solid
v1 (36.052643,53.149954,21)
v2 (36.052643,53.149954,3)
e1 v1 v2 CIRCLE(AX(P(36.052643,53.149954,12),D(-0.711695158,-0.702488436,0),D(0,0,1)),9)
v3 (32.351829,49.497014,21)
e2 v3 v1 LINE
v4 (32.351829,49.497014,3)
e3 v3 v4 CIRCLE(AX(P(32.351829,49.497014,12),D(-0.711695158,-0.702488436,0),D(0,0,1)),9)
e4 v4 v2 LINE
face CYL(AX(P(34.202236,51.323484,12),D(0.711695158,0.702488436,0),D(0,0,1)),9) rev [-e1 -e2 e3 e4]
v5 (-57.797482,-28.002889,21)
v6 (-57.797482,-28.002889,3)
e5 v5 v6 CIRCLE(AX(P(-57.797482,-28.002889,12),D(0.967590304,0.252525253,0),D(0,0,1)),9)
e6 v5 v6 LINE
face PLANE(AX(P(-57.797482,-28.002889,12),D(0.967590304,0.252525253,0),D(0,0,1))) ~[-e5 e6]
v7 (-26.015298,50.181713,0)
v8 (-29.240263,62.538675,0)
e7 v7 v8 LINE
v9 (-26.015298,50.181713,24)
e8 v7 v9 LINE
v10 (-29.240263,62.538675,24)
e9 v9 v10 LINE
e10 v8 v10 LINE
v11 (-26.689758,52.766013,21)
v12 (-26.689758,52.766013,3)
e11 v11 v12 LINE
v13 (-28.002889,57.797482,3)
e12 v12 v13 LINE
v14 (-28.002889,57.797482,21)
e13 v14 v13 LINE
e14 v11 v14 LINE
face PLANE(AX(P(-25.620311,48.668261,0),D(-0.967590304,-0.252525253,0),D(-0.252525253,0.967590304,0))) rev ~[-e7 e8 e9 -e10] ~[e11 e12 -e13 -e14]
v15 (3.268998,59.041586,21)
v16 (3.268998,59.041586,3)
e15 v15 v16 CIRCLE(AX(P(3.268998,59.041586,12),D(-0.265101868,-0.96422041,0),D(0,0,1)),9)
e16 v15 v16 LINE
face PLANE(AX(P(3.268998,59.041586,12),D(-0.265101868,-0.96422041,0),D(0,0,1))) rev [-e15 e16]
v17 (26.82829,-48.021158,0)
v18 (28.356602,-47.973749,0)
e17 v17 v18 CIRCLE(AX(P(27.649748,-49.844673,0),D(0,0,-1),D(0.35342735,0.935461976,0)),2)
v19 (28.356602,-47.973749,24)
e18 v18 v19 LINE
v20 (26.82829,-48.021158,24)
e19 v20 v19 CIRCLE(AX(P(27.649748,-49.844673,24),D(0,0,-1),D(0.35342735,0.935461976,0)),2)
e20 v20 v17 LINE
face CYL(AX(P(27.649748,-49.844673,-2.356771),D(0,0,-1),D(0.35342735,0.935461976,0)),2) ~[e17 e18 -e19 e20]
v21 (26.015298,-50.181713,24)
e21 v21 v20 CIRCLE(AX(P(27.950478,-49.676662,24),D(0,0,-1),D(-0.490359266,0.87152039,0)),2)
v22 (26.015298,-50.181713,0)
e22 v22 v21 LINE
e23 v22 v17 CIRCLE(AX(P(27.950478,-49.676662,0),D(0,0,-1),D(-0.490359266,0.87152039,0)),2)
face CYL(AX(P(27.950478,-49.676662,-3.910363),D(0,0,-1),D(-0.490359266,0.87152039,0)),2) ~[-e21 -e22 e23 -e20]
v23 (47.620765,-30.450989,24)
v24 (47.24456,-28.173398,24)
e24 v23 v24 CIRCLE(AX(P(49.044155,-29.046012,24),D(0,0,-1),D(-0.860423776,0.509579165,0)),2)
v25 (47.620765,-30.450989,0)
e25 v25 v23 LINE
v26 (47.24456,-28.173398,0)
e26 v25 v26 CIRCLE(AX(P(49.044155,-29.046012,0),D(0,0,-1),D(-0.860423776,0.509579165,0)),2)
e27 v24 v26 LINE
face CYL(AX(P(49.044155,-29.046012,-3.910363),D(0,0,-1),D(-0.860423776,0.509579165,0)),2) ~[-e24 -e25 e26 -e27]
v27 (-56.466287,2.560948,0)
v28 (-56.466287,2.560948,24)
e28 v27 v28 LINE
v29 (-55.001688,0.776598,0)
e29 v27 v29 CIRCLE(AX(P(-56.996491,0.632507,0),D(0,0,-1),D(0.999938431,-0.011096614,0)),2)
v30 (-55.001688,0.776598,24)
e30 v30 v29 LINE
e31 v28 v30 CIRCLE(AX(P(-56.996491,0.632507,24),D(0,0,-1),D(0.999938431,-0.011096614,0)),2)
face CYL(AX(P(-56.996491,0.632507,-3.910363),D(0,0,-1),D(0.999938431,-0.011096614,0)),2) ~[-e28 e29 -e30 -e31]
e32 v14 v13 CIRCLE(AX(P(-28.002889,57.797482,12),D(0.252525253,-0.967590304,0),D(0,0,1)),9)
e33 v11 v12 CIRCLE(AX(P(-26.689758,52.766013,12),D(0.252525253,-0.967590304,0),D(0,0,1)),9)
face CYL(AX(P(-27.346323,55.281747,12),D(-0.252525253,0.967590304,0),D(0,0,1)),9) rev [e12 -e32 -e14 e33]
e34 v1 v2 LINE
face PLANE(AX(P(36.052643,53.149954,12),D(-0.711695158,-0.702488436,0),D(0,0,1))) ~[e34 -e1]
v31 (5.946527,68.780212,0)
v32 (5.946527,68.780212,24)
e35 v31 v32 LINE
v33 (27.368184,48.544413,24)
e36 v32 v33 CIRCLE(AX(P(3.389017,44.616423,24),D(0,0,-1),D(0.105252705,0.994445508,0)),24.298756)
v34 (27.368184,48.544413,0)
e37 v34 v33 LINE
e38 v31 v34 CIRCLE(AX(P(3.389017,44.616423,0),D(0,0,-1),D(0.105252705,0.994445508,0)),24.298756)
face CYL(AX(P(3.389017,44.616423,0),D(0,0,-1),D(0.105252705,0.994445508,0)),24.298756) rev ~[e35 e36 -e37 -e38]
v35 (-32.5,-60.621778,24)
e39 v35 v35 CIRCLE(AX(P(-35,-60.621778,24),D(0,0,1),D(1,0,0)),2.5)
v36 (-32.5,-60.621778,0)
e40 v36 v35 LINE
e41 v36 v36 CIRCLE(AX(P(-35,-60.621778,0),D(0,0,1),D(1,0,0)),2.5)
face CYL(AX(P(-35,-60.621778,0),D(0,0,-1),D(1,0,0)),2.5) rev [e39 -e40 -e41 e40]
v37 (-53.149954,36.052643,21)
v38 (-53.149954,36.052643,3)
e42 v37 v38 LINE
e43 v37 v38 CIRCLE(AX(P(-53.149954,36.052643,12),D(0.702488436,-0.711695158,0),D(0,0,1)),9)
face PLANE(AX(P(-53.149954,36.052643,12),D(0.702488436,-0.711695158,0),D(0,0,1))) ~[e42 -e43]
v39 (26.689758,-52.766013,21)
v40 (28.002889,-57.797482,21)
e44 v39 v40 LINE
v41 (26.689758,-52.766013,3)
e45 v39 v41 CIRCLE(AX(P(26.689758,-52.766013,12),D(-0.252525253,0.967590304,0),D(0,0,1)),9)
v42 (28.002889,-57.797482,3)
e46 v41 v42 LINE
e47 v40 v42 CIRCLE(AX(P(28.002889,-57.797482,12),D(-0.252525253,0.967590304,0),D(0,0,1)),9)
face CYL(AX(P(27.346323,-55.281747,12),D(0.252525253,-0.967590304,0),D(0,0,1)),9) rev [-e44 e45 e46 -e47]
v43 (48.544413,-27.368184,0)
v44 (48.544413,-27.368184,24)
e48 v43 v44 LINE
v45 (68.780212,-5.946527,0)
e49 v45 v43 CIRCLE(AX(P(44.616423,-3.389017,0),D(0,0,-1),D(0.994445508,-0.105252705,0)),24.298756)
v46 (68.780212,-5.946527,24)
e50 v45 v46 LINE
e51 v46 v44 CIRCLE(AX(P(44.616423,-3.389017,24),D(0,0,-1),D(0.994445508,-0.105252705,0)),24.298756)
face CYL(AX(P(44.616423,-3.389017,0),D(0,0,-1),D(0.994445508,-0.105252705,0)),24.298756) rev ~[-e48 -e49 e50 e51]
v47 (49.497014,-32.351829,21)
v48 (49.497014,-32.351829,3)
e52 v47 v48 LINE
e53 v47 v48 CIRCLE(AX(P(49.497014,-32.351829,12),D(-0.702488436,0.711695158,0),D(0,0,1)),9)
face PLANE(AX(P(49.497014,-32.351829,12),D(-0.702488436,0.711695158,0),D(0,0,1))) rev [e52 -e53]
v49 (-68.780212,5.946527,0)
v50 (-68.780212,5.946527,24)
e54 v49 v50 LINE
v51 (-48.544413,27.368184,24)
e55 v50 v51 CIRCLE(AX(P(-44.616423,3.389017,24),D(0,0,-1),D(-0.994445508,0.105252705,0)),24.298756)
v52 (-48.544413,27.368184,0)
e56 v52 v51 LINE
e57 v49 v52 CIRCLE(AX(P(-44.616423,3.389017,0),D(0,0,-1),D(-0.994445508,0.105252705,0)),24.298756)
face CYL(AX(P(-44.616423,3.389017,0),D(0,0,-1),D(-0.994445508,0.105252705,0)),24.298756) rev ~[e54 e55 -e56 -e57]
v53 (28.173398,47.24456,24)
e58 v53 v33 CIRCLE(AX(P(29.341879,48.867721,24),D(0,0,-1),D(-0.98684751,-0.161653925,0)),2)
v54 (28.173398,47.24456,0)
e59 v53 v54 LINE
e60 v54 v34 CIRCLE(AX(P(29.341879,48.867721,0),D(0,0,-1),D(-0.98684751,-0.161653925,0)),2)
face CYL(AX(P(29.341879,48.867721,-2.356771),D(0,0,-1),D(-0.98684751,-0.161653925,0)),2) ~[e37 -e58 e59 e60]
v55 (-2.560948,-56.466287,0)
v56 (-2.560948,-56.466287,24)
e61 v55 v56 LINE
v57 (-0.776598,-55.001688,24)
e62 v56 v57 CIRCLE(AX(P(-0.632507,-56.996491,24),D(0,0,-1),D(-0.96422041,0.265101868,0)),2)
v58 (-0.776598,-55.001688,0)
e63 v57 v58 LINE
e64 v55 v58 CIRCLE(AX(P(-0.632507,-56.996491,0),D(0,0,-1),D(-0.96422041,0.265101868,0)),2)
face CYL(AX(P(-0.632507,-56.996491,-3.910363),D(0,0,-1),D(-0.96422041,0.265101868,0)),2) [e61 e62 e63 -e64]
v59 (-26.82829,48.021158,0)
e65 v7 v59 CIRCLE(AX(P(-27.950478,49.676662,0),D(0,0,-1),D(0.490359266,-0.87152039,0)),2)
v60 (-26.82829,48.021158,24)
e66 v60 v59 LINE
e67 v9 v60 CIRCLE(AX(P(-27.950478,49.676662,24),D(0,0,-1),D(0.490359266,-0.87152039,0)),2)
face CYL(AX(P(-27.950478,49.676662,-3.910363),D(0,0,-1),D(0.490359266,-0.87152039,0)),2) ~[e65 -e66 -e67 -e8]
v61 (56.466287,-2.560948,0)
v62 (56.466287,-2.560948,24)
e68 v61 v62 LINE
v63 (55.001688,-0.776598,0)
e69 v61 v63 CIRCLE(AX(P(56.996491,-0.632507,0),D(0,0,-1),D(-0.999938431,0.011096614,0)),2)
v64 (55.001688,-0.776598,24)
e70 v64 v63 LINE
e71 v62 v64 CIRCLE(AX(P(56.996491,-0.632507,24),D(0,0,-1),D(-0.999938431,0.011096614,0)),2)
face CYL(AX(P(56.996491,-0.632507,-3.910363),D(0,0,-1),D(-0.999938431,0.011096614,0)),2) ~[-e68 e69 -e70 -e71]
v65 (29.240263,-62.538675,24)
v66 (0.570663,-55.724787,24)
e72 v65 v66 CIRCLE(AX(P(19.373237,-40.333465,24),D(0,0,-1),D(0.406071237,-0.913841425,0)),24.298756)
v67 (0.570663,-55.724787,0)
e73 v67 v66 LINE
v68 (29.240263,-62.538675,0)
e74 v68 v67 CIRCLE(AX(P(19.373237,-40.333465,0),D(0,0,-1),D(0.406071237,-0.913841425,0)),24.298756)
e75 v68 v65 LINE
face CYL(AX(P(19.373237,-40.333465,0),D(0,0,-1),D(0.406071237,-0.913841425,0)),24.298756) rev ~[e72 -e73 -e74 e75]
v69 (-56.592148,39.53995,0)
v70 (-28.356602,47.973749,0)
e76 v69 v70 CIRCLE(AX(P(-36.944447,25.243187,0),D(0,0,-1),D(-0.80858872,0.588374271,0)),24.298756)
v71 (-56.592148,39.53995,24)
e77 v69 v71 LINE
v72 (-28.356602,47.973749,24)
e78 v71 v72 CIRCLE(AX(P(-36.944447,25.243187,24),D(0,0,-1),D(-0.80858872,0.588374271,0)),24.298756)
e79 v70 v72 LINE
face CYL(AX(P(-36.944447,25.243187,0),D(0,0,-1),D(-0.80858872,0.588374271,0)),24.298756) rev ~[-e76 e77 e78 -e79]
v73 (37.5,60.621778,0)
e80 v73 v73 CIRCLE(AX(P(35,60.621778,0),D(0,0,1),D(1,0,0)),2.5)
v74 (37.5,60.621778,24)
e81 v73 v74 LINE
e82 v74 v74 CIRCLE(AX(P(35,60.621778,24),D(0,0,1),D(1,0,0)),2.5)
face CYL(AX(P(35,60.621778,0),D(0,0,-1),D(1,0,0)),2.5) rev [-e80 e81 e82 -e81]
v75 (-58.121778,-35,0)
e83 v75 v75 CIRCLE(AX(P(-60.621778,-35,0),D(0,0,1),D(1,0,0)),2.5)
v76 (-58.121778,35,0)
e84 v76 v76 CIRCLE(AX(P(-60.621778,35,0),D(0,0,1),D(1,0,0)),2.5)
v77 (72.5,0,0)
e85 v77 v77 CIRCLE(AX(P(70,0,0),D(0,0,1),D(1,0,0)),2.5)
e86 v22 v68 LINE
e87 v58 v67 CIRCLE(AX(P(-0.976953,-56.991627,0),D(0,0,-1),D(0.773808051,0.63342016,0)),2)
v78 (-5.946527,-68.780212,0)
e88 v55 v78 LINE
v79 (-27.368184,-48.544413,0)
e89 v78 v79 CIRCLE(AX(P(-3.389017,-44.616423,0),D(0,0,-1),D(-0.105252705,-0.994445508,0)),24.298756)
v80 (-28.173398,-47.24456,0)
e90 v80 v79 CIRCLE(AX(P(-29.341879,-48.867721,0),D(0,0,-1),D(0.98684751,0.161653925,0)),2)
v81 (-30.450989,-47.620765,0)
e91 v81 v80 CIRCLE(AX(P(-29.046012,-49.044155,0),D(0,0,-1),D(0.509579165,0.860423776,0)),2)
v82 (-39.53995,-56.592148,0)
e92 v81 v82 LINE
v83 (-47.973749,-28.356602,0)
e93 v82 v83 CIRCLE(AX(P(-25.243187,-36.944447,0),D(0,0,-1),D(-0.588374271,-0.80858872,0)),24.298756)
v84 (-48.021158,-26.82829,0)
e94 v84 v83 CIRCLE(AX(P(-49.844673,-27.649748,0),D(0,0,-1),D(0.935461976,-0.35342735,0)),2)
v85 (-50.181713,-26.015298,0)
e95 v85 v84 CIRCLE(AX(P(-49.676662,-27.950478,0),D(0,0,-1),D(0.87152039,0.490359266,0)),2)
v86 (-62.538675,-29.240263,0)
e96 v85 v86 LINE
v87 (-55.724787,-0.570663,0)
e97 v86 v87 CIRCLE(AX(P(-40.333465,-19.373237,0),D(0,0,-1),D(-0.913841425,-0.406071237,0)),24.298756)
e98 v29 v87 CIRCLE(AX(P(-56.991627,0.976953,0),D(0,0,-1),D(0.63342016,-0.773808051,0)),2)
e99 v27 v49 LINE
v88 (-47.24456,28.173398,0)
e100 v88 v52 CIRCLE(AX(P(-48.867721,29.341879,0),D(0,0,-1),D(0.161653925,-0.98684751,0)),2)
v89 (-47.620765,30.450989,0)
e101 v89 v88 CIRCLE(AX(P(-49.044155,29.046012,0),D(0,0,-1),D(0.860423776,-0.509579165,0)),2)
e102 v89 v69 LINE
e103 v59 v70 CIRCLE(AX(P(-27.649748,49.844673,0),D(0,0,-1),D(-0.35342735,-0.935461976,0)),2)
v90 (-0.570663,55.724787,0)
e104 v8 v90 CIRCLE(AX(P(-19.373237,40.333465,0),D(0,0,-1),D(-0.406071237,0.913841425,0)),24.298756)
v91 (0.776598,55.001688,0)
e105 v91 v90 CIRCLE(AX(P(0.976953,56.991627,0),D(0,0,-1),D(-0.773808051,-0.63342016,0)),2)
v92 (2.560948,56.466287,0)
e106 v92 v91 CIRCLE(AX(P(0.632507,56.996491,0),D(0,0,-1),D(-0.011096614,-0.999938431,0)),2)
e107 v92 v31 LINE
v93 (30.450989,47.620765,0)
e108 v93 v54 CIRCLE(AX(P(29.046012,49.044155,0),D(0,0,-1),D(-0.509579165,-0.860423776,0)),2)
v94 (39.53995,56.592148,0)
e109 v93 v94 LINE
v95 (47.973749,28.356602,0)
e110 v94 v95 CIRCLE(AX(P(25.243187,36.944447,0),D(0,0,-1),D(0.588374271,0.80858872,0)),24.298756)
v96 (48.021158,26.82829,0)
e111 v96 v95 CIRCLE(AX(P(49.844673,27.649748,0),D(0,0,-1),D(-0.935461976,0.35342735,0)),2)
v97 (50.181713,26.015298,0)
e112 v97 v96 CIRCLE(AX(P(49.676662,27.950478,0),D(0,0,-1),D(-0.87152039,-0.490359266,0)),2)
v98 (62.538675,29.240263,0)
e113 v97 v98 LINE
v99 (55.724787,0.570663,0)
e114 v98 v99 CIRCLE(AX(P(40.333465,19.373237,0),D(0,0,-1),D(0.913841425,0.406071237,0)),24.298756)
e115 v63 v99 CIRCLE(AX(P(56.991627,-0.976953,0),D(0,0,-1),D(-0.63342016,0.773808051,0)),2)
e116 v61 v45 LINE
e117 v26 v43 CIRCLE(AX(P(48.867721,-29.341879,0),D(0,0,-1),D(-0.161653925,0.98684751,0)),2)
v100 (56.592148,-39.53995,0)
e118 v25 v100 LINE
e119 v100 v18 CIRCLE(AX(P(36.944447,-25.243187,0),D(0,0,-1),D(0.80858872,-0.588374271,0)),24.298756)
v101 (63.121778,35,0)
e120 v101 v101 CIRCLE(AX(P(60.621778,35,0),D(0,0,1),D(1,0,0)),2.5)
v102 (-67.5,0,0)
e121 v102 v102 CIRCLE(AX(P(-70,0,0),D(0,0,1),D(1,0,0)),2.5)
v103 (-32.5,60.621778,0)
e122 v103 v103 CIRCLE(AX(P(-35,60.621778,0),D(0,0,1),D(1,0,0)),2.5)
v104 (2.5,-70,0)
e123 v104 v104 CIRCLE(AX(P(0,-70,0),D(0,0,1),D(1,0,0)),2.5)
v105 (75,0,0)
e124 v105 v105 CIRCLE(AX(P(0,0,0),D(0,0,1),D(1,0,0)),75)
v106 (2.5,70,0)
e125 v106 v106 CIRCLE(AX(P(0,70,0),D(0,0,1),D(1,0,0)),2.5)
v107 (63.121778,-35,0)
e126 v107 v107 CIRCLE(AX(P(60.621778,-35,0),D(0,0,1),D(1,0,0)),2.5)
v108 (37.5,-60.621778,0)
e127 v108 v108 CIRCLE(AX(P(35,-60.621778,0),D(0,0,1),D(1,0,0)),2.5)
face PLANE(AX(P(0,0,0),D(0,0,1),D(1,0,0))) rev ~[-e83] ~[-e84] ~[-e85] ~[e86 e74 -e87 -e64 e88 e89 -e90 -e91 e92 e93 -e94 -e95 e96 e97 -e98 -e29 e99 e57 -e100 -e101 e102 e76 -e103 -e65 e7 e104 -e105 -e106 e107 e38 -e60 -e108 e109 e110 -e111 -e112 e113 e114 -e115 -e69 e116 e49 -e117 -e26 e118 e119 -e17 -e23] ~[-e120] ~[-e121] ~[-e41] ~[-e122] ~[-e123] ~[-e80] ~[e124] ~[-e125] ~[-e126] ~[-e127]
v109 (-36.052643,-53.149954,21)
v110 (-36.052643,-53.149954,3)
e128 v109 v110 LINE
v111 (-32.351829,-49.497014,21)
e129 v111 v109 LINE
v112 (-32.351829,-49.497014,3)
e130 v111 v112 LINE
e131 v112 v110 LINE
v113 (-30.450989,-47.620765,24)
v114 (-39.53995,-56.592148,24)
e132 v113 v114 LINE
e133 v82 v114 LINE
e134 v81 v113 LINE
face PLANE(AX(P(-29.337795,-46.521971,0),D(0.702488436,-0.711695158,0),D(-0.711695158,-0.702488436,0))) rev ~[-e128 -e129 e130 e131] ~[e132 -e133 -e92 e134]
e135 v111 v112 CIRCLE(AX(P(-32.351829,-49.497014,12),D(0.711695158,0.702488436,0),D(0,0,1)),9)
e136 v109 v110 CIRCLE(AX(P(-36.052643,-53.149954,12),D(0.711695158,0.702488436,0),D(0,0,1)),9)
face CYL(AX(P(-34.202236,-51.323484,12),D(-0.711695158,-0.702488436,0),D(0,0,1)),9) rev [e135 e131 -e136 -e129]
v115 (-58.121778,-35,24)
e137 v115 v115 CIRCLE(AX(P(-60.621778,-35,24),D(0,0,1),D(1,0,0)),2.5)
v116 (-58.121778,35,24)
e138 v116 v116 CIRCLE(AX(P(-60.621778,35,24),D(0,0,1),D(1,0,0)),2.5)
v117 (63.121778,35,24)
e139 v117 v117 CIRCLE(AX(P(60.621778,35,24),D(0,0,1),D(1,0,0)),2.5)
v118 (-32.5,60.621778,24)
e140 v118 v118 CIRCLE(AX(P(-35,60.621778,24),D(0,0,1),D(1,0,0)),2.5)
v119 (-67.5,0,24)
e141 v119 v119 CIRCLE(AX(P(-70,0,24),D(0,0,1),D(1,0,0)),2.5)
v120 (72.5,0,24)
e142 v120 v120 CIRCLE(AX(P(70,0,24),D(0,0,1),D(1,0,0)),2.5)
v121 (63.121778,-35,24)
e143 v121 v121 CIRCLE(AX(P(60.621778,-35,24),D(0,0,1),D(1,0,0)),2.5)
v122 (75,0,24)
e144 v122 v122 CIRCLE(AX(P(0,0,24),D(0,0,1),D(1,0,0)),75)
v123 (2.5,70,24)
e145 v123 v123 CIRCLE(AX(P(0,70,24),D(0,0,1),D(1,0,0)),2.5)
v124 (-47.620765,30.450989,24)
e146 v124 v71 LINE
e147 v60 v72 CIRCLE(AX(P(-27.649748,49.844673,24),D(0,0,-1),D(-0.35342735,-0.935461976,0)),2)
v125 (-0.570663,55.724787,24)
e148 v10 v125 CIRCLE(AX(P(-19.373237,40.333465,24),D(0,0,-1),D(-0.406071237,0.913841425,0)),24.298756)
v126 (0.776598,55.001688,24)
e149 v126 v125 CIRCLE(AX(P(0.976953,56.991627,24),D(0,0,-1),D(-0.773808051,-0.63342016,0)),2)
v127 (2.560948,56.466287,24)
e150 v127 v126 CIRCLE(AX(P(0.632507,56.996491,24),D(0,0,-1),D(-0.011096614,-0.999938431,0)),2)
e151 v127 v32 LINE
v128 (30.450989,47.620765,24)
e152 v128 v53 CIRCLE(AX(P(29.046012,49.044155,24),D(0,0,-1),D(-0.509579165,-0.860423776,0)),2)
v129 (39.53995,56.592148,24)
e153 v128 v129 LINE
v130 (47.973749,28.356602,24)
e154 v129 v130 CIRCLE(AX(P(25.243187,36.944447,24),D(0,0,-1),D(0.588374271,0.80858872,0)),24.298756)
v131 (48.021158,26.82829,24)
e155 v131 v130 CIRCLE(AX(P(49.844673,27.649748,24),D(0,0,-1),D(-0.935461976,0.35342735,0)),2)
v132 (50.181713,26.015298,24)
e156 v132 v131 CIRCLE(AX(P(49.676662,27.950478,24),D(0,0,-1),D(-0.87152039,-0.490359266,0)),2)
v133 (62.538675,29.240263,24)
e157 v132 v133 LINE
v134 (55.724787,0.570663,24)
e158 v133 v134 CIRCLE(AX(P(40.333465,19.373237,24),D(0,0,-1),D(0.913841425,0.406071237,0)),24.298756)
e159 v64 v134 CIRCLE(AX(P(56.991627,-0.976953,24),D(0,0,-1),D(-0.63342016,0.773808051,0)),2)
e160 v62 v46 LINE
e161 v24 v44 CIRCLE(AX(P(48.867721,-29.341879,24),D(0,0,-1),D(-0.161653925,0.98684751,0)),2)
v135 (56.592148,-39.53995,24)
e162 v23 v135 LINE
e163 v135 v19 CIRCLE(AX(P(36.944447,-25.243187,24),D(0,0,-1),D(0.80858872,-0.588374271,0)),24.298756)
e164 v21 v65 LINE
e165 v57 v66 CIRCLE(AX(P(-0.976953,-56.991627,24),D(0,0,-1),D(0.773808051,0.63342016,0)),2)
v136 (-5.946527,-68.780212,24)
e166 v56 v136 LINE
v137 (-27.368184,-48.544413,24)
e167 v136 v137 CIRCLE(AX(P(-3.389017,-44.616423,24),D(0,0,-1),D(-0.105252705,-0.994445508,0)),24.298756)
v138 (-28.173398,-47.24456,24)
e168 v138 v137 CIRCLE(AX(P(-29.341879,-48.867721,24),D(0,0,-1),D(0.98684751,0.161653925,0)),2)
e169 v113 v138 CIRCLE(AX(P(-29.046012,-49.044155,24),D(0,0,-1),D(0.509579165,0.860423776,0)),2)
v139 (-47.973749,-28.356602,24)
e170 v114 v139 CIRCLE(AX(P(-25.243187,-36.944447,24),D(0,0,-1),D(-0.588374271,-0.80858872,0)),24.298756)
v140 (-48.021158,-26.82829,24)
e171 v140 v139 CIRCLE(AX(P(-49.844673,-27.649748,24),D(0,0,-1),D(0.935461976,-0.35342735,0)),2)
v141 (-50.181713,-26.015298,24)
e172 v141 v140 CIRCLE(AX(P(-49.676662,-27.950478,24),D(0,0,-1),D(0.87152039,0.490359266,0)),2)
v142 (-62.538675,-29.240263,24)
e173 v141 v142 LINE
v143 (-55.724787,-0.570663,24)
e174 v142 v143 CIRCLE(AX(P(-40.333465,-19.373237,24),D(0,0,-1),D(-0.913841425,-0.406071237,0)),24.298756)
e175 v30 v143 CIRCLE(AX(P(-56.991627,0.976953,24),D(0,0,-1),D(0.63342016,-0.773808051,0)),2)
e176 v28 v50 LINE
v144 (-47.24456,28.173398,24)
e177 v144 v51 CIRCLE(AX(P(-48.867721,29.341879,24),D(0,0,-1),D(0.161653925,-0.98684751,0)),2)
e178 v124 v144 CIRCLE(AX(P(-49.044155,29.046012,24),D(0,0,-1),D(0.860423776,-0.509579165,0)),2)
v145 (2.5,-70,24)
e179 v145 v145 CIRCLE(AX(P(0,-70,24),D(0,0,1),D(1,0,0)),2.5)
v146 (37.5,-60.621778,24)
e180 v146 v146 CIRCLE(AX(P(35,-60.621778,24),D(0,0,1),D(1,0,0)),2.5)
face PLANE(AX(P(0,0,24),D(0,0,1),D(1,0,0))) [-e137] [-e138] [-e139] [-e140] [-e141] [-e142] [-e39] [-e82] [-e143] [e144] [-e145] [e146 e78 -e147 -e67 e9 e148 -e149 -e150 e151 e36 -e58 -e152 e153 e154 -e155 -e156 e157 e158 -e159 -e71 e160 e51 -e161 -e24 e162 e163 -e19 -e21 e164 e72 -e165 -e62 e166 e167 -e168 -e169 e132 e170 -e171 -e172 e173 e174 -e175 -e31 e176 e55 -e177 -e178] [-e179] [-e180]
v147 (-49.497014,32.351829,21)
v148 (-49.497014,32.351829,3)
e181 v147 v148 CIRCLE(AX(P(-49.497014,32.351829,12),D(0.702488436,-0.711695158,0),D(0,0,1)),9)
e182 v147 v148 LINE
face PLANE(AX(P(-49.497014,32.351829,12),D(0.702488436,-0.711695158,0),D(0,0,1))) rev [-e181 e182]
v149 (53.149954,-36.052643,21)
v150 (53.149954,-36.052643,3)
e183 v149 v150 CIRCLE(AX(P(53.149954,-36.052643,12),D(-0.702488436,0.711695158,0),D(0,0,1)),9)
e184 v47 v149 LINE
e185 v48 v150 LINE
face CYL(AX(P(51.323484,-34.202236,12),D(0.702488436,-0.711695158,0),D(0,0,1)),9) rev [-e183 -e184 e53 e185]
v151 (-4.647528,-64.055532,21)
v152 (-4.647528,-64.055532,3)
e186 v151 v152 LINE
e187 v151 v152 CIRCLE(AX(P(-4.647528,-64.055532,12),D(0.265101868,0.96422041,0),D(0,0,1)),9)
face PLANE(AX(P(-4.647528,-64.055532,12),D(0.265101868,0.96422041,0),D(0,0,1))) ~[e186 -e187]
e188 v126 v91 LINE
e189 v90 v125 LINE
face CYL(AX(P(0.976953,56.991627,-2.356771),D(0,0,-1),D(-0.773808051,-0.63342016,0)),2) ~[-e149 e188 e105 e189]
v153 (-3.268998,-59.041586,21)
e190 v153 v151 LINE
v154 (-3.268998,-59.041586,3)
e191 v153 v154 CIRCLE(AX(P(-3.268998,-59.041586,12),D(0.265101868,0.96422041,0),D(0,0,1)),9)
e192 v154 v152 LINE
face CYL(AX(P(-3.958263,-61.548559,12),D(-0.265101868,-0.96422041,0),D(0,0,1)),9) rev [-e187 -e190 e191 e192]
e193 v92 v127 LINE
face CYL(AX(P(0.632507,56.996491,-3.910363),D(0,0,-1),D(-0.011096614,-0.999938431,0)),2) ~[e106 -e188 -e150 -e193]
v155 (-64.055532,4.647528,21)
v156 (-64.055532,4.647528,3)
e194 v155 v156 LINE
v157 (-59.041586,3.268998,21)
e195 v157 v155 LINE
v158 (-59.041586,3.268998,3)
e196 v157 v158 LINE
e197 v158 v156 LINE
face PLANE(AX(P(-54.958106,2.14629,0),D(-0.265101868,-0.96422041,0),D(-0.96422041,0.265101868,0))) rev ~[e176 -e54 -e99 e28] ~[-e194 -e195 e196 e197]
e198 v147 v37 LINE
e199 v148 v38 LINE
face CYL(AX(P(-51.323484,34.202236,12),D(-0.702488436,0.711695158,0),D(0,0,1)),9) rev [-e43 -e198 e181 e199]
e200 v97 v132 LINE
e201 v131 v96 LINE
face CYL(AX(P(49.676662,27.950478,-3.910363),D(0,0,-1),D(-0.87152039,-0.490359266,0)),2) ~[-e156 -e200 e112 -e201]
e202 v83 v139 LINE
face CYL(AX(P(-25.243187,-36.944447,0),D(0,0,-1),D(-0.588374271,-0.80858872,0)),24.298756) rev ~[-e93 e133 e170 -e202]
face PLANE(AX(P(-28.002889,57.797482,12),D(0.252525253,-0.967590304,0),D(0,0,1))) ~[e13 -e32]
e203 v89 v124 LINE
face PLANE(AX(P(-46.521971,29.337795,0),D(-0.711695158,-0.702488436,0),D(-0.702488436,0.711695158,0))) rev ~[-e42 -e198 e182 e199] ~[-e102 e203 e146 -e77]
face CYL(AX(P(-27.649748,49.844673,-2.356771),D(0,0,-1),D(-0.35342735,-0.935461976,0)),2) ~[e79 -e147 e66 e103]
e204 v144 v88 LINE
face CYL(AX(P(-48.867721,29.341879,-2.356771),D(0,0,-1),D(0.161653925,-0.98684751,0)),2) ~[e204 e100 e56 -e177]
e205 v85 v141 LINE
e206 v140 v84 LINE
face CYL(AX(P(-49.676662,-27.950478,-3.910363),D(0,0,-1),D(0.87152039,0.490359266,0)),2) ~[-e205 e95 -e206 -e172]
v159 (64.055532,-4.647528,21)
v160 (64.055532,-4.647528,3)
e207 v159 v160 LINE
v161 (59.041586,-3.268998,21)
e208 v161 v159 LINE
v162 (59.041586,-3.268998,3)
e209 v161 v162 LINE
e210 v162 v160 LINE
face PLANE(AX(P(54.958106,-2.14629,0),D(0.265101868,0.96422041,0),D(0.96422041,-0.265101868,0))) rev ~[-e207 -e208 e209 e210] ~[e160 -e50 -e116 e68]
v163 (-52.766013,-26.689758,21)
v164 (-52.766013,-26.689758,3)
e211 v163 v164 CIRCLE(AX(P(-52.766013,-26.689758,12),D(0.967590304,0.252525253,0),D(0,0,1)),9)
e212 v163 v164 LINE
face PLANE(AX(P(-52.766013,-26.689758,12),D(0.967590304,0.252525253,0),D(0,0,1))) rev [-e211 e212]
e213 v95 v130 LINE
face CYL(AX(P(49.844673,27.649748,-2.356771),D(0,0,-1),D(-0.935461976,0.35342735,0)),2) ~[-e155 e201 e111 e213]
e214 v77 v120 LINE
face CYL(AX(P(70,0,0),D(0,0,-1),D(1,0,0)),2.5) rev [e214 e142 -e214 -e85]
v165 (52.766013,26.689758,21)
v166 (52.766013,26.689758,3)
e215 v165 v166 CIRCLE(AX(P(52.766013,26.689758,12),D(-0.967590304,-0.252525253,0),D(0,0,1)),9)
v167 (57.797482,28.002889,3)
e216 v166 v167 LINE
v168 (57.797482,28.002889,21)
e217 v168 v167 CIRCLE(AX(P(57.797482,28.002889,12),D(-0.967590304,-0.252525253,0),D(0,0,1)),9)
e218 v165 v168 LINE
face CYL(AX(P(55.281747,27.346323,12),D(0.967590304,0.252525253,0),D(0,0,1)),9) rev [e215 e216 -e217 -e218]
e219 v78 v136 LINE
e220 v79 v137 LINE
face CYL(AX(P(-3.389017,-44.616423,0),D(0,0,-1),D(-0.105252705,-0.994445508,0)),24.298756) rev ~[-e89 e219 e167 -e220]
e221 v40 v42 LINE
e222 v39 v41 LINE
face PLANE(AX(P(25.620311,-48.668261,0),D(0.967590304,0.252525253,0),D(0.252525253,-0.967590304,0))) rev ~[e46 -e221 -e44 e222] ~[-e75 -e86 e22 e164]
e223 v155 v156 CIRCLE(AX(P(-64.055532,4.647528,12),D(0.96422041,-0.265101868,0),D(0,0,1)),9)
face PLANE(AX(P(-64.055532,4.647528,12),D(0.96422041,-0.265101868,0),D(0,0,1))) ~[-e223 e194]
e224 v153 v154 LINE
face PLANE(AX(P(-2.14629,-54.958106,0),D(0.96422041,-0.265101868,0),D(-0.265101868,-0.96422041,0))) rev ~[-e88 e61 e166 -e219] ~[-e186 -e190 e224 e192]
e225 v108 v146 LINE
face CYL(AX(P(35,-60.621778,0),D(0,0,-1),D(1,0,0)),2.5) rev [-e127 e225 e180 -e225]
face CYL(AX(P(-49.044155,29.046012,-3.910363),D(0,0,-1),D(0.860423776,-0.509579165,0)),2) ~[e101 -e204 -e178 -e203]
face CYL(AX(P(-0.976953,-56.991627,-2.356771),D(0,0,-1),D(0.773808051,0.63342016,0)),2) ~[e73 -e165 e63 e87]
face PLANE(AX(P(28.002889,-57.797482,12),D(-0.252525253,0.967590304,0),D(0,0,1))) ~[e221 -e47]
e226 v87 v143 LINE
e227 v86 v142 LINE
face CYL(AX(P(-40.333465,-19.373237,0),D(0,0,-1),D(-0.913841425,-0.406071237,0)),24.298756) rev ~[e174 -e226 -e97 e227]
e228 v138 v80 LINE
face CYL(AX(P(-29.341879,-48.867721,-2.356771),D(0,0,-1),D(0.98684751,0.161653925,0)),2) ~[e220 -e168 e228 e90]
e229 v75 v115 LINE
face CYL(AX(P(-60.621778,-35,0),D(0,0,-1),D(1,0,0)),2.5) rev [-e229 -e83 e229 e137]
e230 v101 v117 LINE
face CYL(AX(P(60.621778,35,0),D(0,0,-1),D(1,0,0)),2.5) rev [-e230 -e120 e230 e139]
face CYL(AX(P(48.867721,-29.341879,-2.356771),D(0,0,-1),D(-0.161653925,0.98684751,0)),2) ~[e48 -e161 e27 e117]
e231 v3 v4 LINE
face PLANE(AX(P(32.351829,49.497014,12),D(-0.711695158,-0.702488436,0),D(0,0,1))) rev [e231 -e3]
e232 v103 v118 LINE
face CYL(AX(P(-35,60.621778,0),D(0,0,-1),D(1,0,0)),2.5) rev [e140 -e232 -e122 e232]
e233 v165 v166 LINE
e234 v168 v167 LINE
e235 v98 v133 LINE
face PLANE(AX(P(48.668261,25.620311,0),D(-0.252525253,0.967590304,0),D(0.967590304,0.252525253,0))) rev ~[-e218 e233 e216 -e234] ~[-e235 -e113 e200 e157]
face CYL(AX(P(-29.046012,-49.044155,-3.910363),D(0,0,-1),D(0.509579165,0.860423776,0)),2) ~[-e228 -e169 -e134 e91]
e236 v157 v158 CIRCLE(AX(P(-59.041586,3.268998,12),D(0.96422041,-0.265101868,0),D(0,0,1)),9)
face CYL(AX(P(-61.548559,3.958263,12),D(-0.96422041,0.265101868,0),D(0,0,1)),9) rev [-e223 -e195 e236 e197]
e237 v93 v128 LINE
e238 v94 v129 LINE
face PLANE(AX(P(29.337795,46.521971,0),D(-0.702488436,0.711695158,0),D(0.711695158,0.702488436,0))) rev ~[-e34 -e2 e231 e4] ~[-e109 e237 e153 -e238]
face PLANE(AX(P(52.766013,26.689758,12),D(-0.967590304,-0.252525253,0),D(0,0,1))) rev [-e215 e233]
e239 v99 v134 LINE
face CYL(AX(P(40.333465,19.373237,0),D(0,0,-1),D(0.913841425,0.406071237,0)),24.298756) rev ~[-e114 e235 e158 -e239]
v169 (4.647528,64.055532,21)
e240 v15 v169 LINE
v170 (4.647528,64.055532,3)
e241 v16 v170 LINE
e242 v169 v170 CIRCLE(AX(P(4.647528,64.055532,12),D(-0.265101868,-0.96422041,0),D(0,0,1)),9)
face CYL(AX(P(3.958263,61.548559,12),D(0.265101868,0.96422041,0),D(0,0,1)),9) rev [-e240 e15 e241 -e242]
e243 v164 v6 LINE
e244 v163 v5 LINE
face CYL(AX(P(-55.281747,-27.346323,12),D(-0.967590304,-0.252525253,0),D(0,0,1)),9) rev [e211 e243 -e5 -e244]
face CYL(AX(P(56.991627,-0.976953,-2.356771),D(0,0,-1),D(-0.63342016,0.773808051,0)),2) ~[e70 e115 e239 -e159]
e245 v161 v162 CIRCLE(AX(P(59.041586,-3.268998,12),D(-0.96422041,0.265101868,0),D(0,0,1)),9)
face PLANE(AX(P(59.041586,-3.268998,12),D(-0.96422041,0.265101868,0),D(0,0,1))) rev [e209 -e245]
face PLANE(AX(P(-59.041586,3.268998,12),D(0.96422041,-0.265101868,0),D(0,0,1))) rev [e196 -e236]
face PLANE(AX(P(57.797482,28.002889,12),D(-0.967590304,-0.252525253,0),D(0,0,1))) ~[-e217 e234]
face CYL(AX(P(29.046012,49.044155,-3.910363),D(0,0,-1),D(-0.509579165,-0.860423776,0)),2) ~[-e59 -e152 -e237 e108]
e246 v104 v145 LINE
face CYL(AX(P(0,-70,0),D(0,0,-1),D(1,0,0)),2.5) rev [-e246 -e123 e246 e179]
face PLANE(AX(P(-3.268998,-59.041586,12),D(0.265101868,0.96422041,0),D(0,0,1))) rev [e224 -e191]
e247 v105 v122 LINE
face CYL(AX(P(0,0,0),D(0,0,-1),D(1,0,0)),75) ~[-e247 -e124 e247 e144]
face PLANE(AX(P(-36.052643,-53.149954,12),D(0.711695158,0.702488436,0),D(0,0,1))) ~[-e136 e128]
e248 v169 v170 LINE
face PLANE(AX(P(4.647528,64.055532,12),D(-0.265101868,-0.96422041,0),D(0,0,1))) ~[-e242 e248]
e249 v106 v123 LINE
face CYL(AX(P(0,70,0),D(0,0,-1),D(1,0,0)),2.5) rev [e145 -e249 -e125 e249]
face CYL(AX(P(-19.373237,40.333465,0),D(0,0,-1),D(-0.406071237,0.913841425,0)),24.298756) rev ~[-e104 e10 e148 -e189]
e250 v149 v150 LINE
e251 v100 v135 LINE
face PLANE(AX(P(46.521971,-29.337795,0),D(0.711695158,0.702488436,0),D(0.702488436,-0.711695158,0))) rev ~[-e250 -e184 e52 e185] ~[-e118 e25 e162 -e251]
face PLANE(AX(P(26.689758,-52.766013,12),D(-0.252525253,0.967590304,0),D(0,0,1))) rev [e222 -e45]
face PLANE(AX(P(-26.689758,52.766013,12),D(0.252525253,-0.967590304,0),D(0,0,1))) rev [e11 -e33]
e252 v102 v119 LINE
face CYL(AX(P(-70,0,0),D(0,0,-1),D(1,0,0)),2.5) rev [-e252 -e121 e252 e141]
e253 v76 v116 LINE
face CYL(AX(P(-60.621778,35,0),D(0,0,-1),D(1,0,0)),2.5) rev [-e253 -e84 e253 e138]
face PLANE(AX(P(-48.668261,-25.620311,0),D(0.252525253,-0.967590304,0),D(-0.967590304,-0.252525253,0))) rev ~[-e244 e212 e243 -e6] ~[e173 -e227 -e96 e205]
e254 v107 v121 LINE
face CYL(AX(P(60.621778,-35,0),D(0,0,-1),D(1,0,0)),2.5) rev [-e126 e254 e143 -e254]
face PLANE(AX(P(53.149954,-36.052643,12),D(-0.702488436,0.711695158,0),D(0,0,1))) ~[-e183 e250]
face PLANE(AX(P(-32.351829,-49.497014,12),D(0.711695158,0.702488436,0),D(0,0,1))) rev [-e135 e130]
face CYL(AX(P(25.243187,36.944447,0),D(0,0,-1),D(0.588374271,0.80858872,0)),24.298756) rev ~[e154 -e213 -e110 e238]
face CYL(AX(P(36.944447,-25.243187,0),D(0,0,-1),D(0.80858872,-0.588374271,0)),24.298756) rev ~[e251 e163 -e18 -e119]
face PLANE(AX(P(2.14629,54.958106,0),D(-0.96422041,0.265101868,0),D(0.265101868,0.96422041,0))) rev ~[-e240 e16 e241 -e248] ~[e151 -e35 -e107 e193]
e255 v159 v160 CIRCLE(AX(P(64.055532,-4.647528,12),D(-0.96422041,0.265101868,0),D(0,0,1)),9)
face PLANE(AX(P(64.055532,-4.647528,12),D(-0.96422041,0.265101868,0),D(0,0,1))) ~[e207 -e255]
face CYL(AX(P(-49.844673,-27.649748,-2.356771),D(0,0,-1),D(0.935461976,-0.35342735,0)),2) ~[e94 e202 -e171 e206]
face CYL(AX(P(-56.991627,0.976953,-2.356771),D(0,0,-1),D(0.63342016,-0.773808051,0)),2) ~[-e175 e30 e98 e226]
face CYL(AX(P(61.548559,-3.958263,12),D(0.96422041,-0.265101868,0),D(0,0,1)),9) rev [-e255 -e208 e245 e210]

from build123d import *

# Parameters (mm, degrees)
F0_R        = 75
F0_R_2      = 2.5
F1_DEPTH    = 24
F2_T1_DEPTH = 28.7135412507
F2_T3_DEPTH = 31.820725312
F3_W        = 5.2
F3_H        = 9
F5_W        = 5.2
F5_H        = 9
F7_W        = 5.2
F7_H        = 9
F9_W        = 5.2
F9_H        = 9
F11_W       = 5.2
F11_H       = 9
F13_W       = 5.2
F13_H       = 9
F15_W       = 5.2
F15_H       = 9
F17_W       = 5.2
F17_H       = 9
F19_W       = 5.2
F19_H       = 9
F21_W       = 5.2
F21_H       = 9
F23_W       = 5.2
F23_H       = 9
F25_W       = 5.2
F25_H       = 9


# Not quite as in the source:
# - a fillet or chamfer that OpenCascade refuses, or shapes differently, is made with other operations: its cross-section is extruded or revolved along the edge and cut away or added


with BuildPart() as f1:
    # F0 (on Top) → F1 (new body)
    with BuildSketch(Plane.XY):
        Circle(F0_R)
        with Locations((-35, -60.6217782649)):
            Circle(F0_R_2, mode=Mode.SUBTRACT)
        with Locations((-60.6217782649, -35)):
            Circle(F0_R_2, mode=Mode.SUBTRACT)
        with Locations((0, -70)):
            Circle(F0_R_2, mode=Mode.SUBTRACT)
        with Locations((35, -60.6217782649)):
            Circle(F0_R_2, mode=Mode.SUBTRACT)
        with Locations((60.6217782649, -35)):
            Circle(F0_R_2, mode=Mode.SUBTRACT)
        with Locations((-70, 0)):
            Circle(F0_R_2, mode=Mode.SUBTRACT)
        with Locations((-60.6217782649, 35)):
            Circle(F0_R_2, mode=Mode.SUBTRACT)
        with Locations((-35, 60.6217782649)):
            Circle(F0_R_2, mode=Mode.SUBTRACT)
        with BuildLine():
            ThreePointArc((47.6313972081, 27.5), (48.1590007851, 26.5652149131), (48.6682611369, 25.6203114327))
            Line((48.6682611369, 25.6203114327), (62.5386747714, 29.2402626562))
            ThreePointArc((62.5386747714, 29.2402626562), (63.8628004781, 13.3069433392), (55, 0))
            ThreePointArc((55, 0), (54.9895255573, -1.0733494209), (54.9581062189, -2.1462900149))
            Line((54.9581062189, -2.1462900149), (68.7802123992, -5.9465271121))
            ThreePointArc((68.7802123992, -5.9465271121), (61.9602792404, -20.4072492606), (47.6313972081, -27.5))
            ThreePointArc((47.6313972081, -27.5), (47.0856513643, -28.4243106443), (46.521971122, -29.3377947863))
            Line((46.521971122, -29.3377947863), (56.5921476593, -39.539949743))
            ThreePointArc((56.5921476593, -39.539949743), (43.4555512175, -48.6533359013), (27.5, -47.6313972081))
            ThreePointArc((27.5, -47.6313972081), (26.5652149131, -48.1590007851), (25.6203114327, -48.6682611369))
            Line((25.6203114327, -48.6682611369), (29.2402626562, -62.5386747714))
            ThreePointArc((29.2402626562, -62.5386747714), (13.3069433392, -63.8628004781), (0, -55))
            ThreePointArc((0, -55), (-1.0733494209, -54.9895255573), (-2.1462900149, -54.9581062189))
            Line((-2.1462900149, -54.9581062189), (-5.9465271121, -68.7802123992))
            ThreePointArc((-5.9465271121, -68.7802123992), (-20.4072492606, -61.9602792404), (-27.5, -47.6313972081))
            ThreePointArc((-27.5, -47.6313972081), (-28.4243106443, -47.0856513643), (-29.3377947863, -46.521971122))
            Line((-29.3377947863, -46.521971122), (-39.539949743, -56.5921476593))
            ThreePointArc((-39.539949743, -56.5921476593), (-48.6533359013, -43.4555512175), (-47.6313972081, -27.5))
            ThreePointArc((-47.6313972081, -27.5), (-48.1590007851, -26.5652149131), (-48.6682611369, -25.6203114327))
            Line((-48.6682611369, -25.6203114327), (-62.5386747714, -29.2402626562))
            ThreePointArc((-62.5386747714, -29.2402626562), (-63.8628004781, -13.3069433392), (-55, 0))
            ThreePointArc((-55, 0), (-54.9895255573, 1.0733494209), (-54.9581062189, 2.1462900149))
            Line((-54.9581062189, 2.1462900149), (-68.7802123992, 5.9465271121))
            ThreePointArc((-68.7802123992, 5.9465271121), (-61.9602792404, 20.4072492606), (-47.6313972081, 27.5))
            ThreePointArc((-47.6313972081, 27.5), (-47.0856513643, 28.4243106443), (-46.521971122, 29.3377947863))
            Line((-46.521971122, 29.3377947863), (-56.5921476593, 39.539949743))
            ThreePointArc((-56.5921476593, 39.539949743), (-43.4555512175, 48.6533359013), (-27.5, 47.6313972081))
            ThreePointArc((-27.5, 47.6313972081), (-26.5652149131, 48.1590007851), (-25.6203114327, 48.6682611369))
            Line((-25.6203114327, 48.6682611369), (-29.2402626562, 62.5386747714))
            ThreePointArc((-29.2402626562, 62.5386747714), (-13.3069433392, 63.8628004781), (0, 55))
            ThreePointArc((0, 55), (1.0733494209, 54.9895255573), (2.1462900149, 54.9581062189))
            Line((2.1462900149, 54.9581062189), (5.9465271121, 68.7802123992))
            ThreePointArc((5.9465271121, 68.7802123992), (20.4072492606, 61.9602792404), (27.5, 47.6313972081))
            ThreePointArc((27.5, 47.6313972081), (28.4243106443, 47.0856513643), (29.3377947863, 46.521971122))
            Line((29.3377947863, 46.521971122), (39.539949743, 56.5921476593))
            ThreePointArc((39.539949743, 56.5921476593), (48.6533359013, 43.4555512175), (47.6313972081, 27.5))
        make_face(mode=Mode.SUBTRACT)
        with Locations((70, 0)):
            Circle(F0_R_2, mode=Mode.SUBTRACT)
        with Locations((60.6217782649, 35)):
            Circle(F0_R_2, mode=Mode.SUBTRACT)
        with Locations((0, 70)):
            Circle(F0_R_2, mode=Mode.SUBTRACT)
        with Locations((35, 60.6217782649)):
            Circle(F0_R_2, mode=Mode.SUBTRACT)
    extrude(amount=F1_DEPTH)

    # F2: fillet of radius 2 on 24 edges, made by hand

    # F2_s2 → F2_t1 (cut)
    with BuildSketch(Plane.XY.offset(-2.3567706253)):
        with BuildLine():
            ThreePointArc((48.5444127172, -27.3681843784), (47.7446967943, -27.6869420566), (47.1530637041, -28.3123397711))
            ThreePointArc((47.1530637041, -28.3123397711), (47.3939709413, -27.9071947429), (47.6313972081, -27.5))
            ThreePointArc((47.6313972081, -27.5), (48.0885305527, -27.4384253126), (48.5444127172, -27.3681843784))
        make_face()
        with BuildLine():
            ThreePointArc((55.7247868141, 0.5706634314), (55.1915913481, -0.105246777), (54.9919209196, -0.9426736303))
            ThreePointArc((54.9919209196, -0.9426736303), (54.9979801928, -0.4713541251), (55, 0))
            ThreePointArc((55, 0), (55.3651017456, 0.2818919158), (55.7247868141, 0.5706634314))
        make_face()
        with BuildLine():
            ThreePointArc((47.9737492858, 28.3566024357), (47.8499435712, 27.5046492916), (48.0957373344, 26.6795811484))
            ThreePointArc((48.0957373344, 26.6795811484), (47.8653250663, 27.0907854499), (47.6313972081, 27.5))
            ThreePointArc((47.6313972081, 27.5), (47.8066386369, 27.926676433), (47.9737492858, 28.3566024357))
        make_face()
        with BuildLine():
            ThreePointArc((27.3681843784, 48.5444127172), (27.6869420566, 47.7446967943), (28.3123397711, 47.1530637041))
            ThreePointArc((28.3123397711, 47.1530637041), (27.9071947429, 47.3939709413), (27.5, 47.6313972081))
            ThreePointArc((27.5, 47.6313972081), (27.4384253126, 48.0885305527), (27.3681843784, 48.5444127172))
        make_face()
        with BuildLine():
            ThreePointArc((-0.5706634314, 55.7247868141), (0.105246777, 55.1915913481), (0.9426736303, 54.9919209196))
            ThreePointArc((0.9426736303, 54.9919209196), (0.4713541251, 54.9979801928), (0, 55))
            ThreePointArc((0, 55), (-0.2818919158, 55.3651017456), (-0.5706634314, 55.7247868141))
        make_face()
        with BuildLine():
            ThreePointArc((-28.3566024357, 47.9737492858), (-27.5046492916, 47.8499435712), (-26.6795811484, 48.0957373344))
            ThreePointArc((-26.6795811484, 48.0957373344), (-27.0907854499, 47.8653250663), (-27.5, 47.6313972081))
            ThreePointArc((-27.5, 47.6313972081), (-27.926676433, 47.8066386369), (-28.3566024357, 47.9737492858))
        make_face()
        with BuildLine():
            ThreePointArc((-48.5444127172, 27.3681843784), (-47.7446967943, 27.6869420566), (-47.1530637041, 28.3123397711))
            ThreePointArc((-47.1530637041, 28.3123397711), (-47.3939709413, 27.9071947429), (-47.6313972081, 27.5))
            ThreePointArc((-47.6313972081, 27.5), (-48.0885305527, 27.4384253126), (-48.5444127172, 27.3681843784))
        make_face()
        with BuildLine():
            ThreePointArc((28.3566024357, -47.9737492858), (27.5046492916, -47.8499435712), (26.6795811484, -48.0957373344))
            ThreePointArc((26.6795811484, -48.0957373344), (27.0907854499, -47.8653250663), (27.5, -47.6313972081))
            ThreePointArc((27.5, -47.6313972081), (27.926676433, -47.8066386369), (28.3566024357, -47.9737492858))
        make_face()
        with BuildLine():
            ThreePointArc((0.5706634314, -55.7247868141), (-0.105246777, -55.1915913481), (-0.9426736303, -54.9919209196))
            ThreePointArc((-0.9426736303, -54.9919209196), (-0.4713541251, -54.9979801928), (0, -55))
            ThreePointArc((0, -55), (0.2818919158, -55.3651017456), (0.5706634314, -55.7247868141))
        make_face()
        with BuildLine():
            ThreePointArc((-27.3681843784, -48.5444127172), (-27.6869420566, -47.7446967943), (-28.3123397711, -47.1530637041))
            ThreePointArc((-28.3123397711, -47.1530637041), (-27.9071947429, -47.3939709413), (-27.5, -47.6313972081))
            ThreePointArc((-27.5, -47.6313972081), (-27.4384253126, -48.0885305527), (-27.3681843784, -48.5444127172))
        make_face()
        with BuildLine():
            ThreePointArc((-47.9737492858, -28.3566024357), (-47.8499435712, -27.5046492916), (-48.0957373344, -26.6795811484))
            ThreePointArc((-48.0957373344, -26.6795811484), (-47.8653250663, -27.0907854499), (-47.6313972081, -27.5))
            ThreePointArc((-47.6313972081, -27.5), (-47.8066386369, -27.926676433), (-47.9737492858, -28.3566024357))
        make_face()
        with BuildLine():
            ThreePointArc((-55.7247868141, -0.5706634314), (-55.1915913481, 0.105246777), (-54.9919209196, 0.9426736303))
            ThreePointArc((-54.9919209196, 0.9426736303), (-54.9979801928, 0.4713541251), (-55, 0))
            ThreePointArc((-55, 0), (-55.3651017456, -0.2818919158), (-55.7247868141, -0.5706634314))
        make_face()
    extrude(amount=F2_T1_DEPTH, mode=Mode.SUBTRACT)

    # F2_s4 → F2_t3 (cut)
    with BuildSketch(Plane.XY.offset(-3.910362656)):
        with BuildLine():
            ThreePointArc((47.3233077029, -28.0268540521), (47.0590442233, -29.2895984831), (47.6207649404, -30.450989253))
            Line((47.6207649404, -30.450989253), (46.521971122, -29.3377947863))
            ThreePointArc((46.521971122, -29.3377947863), (46.9272173779, -28.6851227846), (47.3233077029, -28.0268540521))
        make_face()
        with BuildLine():
            ThreePointArc((54.9966136879, -0.6103137458), (55.3991270167, -1.8360142413), (56.4662868126, -2.5609477933))
            Line((56.4662868126, -2.5609477933), (54.9581062189, -2.1462900149))
            ThreePointArc((54.9581062189, -2.1462900149), (54.9827237705, -1.3784363531), (54.9966136879, -0.6103137458))
        make_face()
        with BuildLine():
            ThreePointArc((47.9336214487, 26.9697596358), (48.8950584646, 26.1095285337), (50.1817127337, 26.0152975595))
            Line((50.1817127337, 26.0152975595), (48.6682611369, 25.6203114327))
            ThreePointArc((48.6682611369, 25.6203114327), (48.3056537311, 26.2976009859), (47.9336214487, 26.9697596358))
        make_face()
        with BuildLine():
            ThreePointArc((28.0268540521, 47.3233077029), (29.2895984831, 47.0590442233), (30.450989253, 47.6207649404))
            Line((30.450989253, 47.6207649404), (29.3377947863, 46.521971122))
            ThreePointArc((29.3377947863, 46.521971122), (28.6851227846, 46.9272173779), (28.0268540521, 47.3233077029))
        make_face()
        with BuildLine():
            ThreePointArc((0.6103137458, 54.9966136879), (1.8360142413, 55.3991270167), (2.5609477933, 56.4662868126))
            Line((2.5609477933, 56.4662868126), (2.1462900149, 54.9581062189))
            ThreePointArc((2.1462900149, 54.9581062189), (1.3784363531, 54.9827237705), (0.6103137458, 54.9966136879))
        make_face()
        with BuildLine():
            ThreePointArc((-26.9697596358, 47.9336214487), (-26.1095285337, 48.8950584646), (-26.0152975595, 50.1817127337))
            Line((-26.0152975595, 50.1817127337), (-25.6203114327, 48.6682611369))
            ThreePointArc((-25.6203114327, 48.6682611369), (-26.2976009859, 48.3056537311), (-26.9697596358, 47.9336214487))
        make_face()
        with BuildLine():
            ThreePointArc((-47.3233077029, 28.0268540521), (-47.0590442233, 29.2895984831), (-47.6207649404, 30.450989253))
            Line((-47.6207649404, 30.450989253), (-46.521971122, 29.3377947863))
            ThreePointArc((-46.521971122, 29.3377947863), (-46.9272173779, 28.6851227846), (-47.3233077029, 28.0268540521))
        make_face()
        with BuildLine():
            ThreePointArc((26.9697596358, -47.9336214487), (26.1095285337, -48.8950584646), (26.0152975595, -50.1817127337))
            Line((26.0152975595, -50.1817127337), (25.6203114327, -48.6682611369))
            ThreePointArc((25.6203114327, -48.6682611369), (26.2976009859, -48.3056537311), (26.9697596358, -47.9336214487))
        make_face()
        with BuildLine():
            ThreePointArc((-2.5609477933, -56.4662868126), (-1.8360142413, -55.3991270167), (-0.6103137458, -54.9966136879))
            ThreePointArc((-0.6103137458, -54.9966136879), (-1.3784363531, -54.9827237705), (-2.1462900149, -54.9581062189))
            Line((-2.1462900149, -54.9581062189), (-2.5609477933, -56.4662868126))
        make_face()
        with BuildLine():
            ThreePointArc((-28.0268540521, -47.3233077029), (-29.2895984831, -47.0590442233), (-30.450989253, -47.6207649404))
            Line((-30.450989253, -47.6207649404), (-29.3377947863, -46.521971122))
            ThreePointArc((-29.3377947863, -46.521971122), (-28.6851227846, -46.9272173779), (-28.0268540521, -47.3233077029))
        make_face()
        with BuildLine():
            ThreePointArc((-47.9336214487, -26.9697596358), (-48.8950584646, -26.1095285337), (-50.1817127337, -26.0152975595))
            Line((-50.1817127337, -26.0152975595), (-48.6682611369, -25.6203114327))
            ThreePointArc((-48.6682611369, -25.6203114327), (-48.3056537311, -26.2976009859), (-47.9336214487, -26.9697596358))
        make_face()
        with BuildLine():
            ThreePointArc((-54.9966136879, 0.6103137458), (-55.3991270167, 1.8360142413), (-56.4662868126, 2.5609477933))
            Line((-56.4662868126, 2.5609477933), (-54.9581062189, 2.1462900149))
            ThreePointArc((-54.9581062189, 2.1462900149), (-54.9827237705, 1.3784363531), (-54.9966136879, 0.6103137458))
        make_face()
    extrude(amount=F2_T3_DEPTH, mode=Mode.SUBTRACT)

    # F3 (on face) → F4 (revolve, cut)
    with BuildSketch(Plane(origin=(-3.1565656566, 12.0948788029, 0), x_dir=(0.9675903042, 0.2525252525, 0), z_dir=(0.2525252525, -0.9675903042, 0))):
        with Locations((60.3957200593, 16.5)):
            Rectangle(F3_W, F3_H)
    revolve(axis=Axis((55.2817474897, 27.3463232623, 12), (-0.9675903042, -0.2525252525, 0)), mode=Mode.SUBTRACT)

    # F5 (on face) → F6 (revolve, cut)
    with BuildSketch(Plane(origin=(3.3137733541, 12.0527551273, 0), x_dir=(0.9642204102, -0.2651018683, 0), z_dir=(-0.2651018683, -0.9642204102, 0))):
        with Locations((60.3957200593, 16.5)):
            Rectangle(F5_W, F5_H)
    revolve(axis=Axis((61.5485593228, -3.9582630996, 12), (-0.9642204102, 0.2651018683, 0)), mode=Mode.SUBTRACT)

    # F7 (on face) → F8 (revolve, cut)
    with BuildSketch(Plane(origin=(8.8961894707, 8.7811054487, 0), x_dir=(0.7024884359, -0.7116951577, 0), z_dir=(-0.7116951577, -0.7024884359, 0))):
        with Locations((60.3957200593, 16.5)):
            Rectangle(F7_W, F7_H)
    revolve(axis=Axis((51.3234843901, -34.2022360606, 12), (-0.7024884359, 0.7116951577, 0)), mode=Mode.SUBTRACT)

    # F9 (on face) → F10 (revolve, cut)
    with BuildSketch(Plane(origin=(12.0948788029, 3.1565656566, 0), x_dir=(0.2525252525, -0.9675903042, 0), z_dir=(-0.9675903042, -0.2525252525, 0))):
        with Locations((60.3957200593, 16.5)):
            Rectangle(F9_W, F9_H)
    revolve(axis=Axis((27.3463232623, -55.2817474897, 12), (-0.2525252525, 0.9675903042, 0)), mode=Mode.SUBTRACT)

    # F11 (on face) → F12 (revolve, cut)
    with BuildSketch(Plane(origin=(12.0527551273, -3.3137733541, 0), x_dir=(-0.2651018683, -0.9642204102, 0), z_dir=(-0.9642204102, 0.2651018683, 0))):
        with Locations((60.3957200593, 16.5)):
            Rectangle(F11_W, F11_H)
    revolve(axis=Axis((-3.9582630996, -61.5485593228, 12), (0.2651018683, 0.9642204102, 0)), mode=Mode.SUBTRACT)

    # F13 (on face) → F14 (revolve, cut)
    with BuildSketch(Plane(origin=(8.7811054487, -8.8961894707, 0), x_dir=(-0.7116951577, -0.7024884359, 0), z_dir=(-0.7024884359, 0.7116951577, 0))):
        with Locations((60.3957200593, 16.5)):
            Rectangle(F13_W, F13_H)
    revolve(axis=Axis((-34.2022360606, -51.3234843901, 12), (0.7116951577, 0.7024884359, 0)), mode=Mode.SUBTRACT)

    # F15 (on face) → F16 (revolve, cut)
    with BuildSketch(Plane(origin=(3.1565656566, -12.0948788029, 0), x_dir=(-0.9675903042, -0.2525252525, 0), z_dir=(-0.2525252525, 0.9675903042, 0))):
        with Locations((60.3957200593, 16.5)):
            Rectangle(F15_W, F15_H)
    revolve(axis=Axis((-55.2817474897, -27.3463232623, 12), (0.9675903042, 0.2525252525, 0)), mode=Mode.SUBTRACT)

    # F17 (on face) → F18 (revolve, cut)
    with BuildSketch(Plane(origin=(-3.3137733541, -12.0527551273, 0), x_dir=(-0.9642204102, 0.2651018683, 0), z_dir=(0.2651018683, 0.9642204102, 0))):
        with Locations((60.3957200593, 16.5)):
            Rectangle(F17_W, F17_H)
    revolve(axis=Axis((-61.5485593228, 3.9582630996, 12), (0.9642204102, -0.2651018683, 0)), mode=Mode.SUBTRACT)

    # F19 (on face) → F20 (revolve, cut)
    with BuildSketch(Plane(origin=(-8.8961894707, -8.7811054487, 0), x_dir=(-0.7024884359, 0.7116951577, 0), z_dir=(0.7116951577, 0.7024884359, 0))):
        with Locations((60.3957200593, 16.5)):
            Rectangle(F19_W, F19_H)
    revolve(axis=Axis((-51.3234843901, 34.2022360606, 12), (0.7024884359, -0.7116951577, 0)), mode=Mode.SUBTRACT)

    # F21 (on face) → F22 (revolve, cut)
    with BuildSketch(Plane(origin=(-12.0948788029, -3.1565656566, 0), x_dir=(-0.2525252525, 0.9675903042, 0), z_dir=(0.9675903042, 0.2525252525, 0))):
        with Locations((60.3957200593, 16.5)):
            Rectangle(F21_W, F21_H)
    revolve(axis=Axis((-27.3463232623, 55.2817474897, 12), (0.2525252525, -0.9675903042, 0)), mode=Mode.SUBTRACT)

    # F23 (on face) → F24 (revolve, cut)
    with BuildSketch(Plane(origin=(-12.0527551273, 3.3137733541, 0), x_dir=(0.2651018683, 0.9642204102, 0), z_dir=(0.9642204102, -0.2651018683, 0))):
        with Locations((60.3957200593, 16.5)):
            Rectangle(F23_W, F23_H)
    revolve(axis=Axis((3.9582630996, 61.5485593228, 12), (-0.2651018683, -0.9642204102, 0)), mode=Mode.SUBTRACT)

    # F25 (on face) → F26 (revolve, cut)
    with BuildSketch(Plane(origin=(-8.7811054487, 8.8961894707, 0), x_dir=(0.7116951577, 0.7024884359, 0), z_dir=(0.7024884359, -0.7116951577, 0))):
        with Locations((60.3957200593, 16.5)):
            Rectangle(F25_W, F25_H)
    revolve(axis=Axis((34.2022360606, 51.3234843901, 12), (-0.7116951577, -0.7024884359, 0)), mode=Mode.SUBTRACT)


solid = f1.part
